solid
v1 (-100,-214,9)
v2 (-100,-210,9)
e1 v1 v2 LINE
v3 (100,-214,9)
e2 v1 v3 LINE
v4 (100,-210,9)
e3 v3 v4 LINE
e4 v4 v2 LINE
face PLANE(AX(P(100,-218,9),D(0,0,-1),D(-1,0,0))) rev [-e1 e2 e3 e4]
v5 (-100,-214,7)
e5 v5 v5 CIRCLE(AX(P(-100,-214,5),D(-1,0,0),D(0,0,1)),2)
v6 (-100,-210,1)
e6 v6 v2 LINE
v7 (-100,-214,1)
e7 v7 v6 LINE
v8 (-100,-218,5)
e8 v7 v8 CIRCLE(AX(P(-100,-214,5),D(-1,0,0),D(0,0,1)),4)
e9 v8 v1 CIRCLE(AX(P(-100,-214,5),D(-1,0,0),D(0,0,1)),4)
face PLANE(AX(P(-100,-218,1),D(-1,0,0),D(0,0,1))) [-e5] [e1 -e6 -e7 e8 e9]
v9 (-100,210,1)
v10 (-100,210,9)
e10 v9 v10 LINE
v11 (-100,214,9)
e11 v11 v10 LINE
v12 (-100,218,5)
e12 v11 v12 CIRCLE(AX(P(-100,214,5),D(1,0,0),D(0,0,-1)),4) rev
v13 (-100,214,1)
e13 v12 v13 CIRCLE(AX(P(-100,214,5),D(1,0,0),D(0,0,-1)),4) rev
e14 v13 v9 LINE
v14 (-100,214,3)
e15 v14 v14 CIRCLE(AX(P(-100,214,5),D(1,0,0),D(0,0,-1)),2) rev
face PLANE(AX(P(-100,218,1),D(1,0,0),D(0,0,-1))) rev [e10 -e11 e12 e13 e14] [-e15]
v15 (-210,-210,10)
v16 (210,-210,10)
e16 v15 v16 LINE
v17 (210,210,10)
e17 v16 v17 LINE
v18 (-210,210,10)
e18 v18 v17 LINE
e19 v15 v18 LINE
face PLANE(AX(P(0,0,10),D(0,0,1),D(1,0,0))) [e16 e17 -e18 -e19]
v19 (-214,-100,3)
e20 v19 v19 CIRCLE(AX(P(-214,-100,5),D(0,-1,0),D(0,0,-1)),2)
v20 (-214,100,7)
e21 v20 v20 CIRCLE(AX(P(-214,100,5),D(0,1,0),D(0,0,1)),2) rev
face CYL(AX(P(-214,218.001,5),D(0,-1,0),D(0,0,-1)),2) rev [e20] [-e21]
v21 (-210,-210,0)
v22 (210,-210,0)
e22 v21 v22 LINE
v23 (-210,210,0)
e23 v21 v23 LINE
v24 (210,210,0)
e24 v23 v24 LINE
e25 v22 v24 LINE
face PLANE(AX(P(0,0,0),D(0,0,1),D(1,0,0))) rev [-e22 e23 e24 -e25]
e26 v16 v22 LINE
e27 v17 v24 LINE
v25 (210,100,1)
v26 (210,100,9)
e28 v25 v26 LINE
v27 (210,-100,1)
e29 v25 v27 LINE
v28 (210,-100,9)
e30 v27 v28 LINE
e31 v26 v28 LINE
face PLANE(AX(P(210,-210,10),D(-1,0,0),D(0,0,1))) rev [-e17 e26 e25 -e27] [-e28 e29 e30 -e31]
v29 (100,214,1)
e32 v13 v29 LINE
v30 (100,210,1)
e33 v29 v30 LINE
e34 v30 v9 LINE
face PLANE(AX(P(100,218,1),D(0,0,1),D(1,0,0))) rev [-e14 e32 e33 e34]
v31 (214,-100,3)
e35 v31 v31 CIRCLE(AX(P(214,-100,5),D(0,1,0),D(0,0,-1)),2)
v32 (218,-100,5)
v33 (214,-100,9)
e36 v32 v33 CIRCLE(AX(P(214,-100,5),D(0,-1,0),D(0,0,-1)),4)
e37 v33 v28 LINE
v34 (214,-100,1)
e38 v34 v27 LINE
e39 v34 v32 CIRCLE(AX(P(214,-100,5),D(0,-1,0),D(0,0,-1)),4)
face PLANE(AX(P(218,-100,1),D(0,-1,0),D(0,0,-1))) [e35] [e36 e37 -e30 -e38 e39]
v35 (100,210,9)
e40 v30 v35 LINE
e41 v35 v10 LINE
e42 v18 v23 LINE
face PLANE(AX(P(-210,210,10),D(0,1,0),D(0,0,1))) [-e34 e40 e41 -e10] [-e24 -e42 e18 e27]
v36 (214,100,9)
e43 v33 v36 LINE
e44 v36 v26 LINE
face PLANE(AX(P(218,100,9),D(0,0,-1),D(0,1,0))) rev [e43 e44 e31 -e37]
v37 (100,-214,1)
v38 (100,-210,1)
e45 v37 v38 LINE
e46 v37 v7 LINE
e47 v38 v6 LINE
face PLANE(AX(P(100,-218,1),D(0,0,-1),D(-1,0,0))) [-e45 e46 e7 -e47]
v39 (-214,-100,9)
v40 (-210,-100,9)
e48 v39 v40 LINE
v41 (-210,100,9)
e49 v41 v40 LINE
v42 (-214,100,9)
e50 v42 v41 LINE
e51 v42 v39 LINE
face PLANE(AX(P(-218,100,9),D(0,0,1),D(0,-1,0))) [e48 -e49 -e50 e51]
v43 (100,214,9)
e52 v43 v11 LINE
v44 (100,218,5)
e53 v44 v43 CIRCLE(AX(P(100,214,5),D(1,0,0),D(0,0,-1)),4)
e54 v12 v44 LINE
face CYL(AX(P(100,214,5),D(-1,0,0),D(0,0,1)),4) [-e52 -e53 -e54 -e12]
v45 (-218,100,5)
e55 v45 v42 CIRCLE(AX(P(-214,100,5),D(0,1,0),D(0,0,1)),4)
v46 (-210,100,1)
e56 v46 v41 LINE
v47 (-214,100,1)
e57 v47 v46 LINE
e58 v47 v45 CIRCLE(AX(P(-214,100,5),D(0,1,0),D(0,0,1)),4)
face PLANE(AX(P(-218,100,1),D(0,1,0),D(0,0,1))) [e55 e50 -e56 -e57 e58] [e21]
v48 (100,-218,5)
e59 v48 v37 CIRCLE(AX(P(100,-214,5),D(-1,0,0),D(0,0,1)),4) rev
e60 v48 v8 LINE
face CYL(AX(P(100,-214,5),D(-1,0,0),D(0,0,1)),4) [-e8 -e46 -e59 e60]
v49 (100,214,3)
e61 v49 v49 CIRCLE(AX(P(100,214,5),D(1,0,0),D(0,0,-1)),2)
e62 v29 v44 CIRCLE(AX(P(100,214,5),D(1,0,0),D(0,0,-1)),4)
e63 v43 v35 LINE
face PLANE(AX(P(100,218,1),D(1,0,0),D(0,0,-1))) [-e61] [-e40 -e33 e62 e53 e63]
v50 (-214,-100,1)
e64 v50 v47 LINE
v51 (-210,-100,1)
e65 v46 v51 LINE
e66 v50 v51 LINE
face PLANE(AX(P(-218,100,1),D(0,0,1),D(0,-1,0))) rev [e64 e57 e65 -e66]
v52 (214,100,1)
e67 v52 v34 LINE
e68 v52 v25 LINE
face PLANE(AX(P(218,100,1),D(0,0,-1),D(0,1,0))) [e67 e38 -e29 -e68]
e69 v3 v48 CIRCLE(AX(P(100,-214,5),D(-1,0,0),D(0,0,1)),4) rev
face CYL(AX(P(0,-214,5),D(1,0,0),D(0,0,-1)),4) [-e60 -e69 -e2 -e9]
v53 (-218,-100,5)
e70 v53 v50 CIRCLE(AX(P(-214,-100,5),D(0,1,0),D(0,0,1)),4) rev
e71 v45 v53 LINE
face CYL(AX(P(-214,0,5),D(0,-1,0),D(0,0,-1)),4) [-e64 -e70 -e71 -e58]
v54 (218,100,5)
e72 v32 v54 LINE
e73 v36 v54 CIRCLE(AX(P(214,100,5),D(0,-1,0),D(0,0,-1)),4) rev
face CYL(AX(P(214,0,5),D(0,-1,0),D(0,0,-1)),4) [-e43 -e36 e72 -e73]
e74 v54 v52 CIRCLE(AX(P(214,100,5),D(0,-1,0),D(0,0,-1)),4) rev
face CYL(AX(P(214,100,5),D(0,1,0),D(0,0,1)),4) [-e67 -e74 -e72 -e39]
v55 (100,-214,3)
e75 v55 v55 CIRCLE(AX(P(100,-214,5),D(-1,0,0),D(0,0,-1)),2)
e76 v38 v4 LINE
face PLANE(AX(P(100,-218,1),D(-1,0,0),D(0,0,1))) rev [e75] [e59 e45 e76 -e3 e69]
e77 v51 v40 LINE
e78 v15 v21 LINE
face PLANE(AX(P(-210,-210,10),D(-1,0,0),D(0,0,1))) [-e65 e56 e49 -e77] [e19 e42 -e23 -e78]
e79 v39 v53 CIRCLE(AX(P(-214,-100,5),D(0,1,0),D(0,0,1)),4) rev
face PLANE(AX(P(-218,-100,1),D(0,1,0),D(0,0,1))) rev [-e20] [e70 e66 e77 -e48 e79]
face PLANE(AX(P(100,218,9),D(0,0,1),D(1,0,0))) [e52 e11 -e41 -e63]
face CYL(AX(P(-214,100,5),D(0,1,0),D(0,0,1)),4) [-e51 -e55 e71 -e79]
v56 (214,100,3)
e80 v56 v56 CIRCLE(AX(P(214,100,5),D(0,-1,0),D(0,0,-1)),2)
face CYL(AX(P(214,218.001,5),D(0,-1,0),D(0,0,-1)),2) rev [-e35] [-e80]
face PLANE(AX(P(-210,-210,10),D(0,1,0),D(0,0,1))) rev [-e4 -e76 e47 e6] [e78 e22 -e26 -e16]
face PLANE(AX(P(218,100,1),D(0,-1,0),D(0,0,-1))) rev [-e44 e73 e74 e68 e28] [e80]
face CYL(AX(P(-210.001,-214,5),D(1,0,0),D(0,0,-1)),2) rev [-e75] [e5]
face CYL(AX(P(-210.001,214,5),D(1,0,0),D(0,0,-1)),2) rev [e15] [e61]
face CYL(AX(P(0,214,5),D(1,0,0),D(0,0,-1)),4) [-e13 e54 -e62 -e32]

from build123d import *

# Parameters (mm, degrees)
SKETCH_1_W             = 420
SKETCH_1_H             = 420
EXTRUDE_1_DEPTH        = 10
SKETCH_2_W             = 200
SKETCH_2_H             = 8
EXTRUDE_2_DEPTH        = 8
CUT_EXTRUDE_1_REACH    = 381.109
SKETCH_3_R             = 2
FILLET_1_R             = 4
FILLET_1_OF_MIRROR_1_R = 4
SKETCH_4_W             = 8
SKETCH_4_H             = 200
EXTRUDE_3_DEPTH        = 8
FILLET_2_R             = 4
CUT_EXTRUDE_2_REACH    = 387.679
SKETCH_5_R             = 2
FILLET_2_OF_MIRROR_3_R = 4


with BuildPart() as part:
    # 草图1 → 凸台-拉伸1 (new body)
    with BuildSketch(Plane.XY):
        Rectangle(SKETCH_1_W, SKETCH_1_H)
    extrude_1 = extrude(amount=EXTRUDE_1_DEPTH)

    # 草图2 → 凸台-拉伸2 (add)
    with BuildSketch(Plane(origin=(0, 210, 0), x_dir=(1, 0, 0), z_dir=(0, 1, 0))):
        with Locations((0, -5)):
            Rectangle(SKETCH_2_W, SKETCH_2_H)
    extrude_2 = extrude(amount=EXTRUDE_2_DEPTH)

    # 草图3 → 切除-拉伸1 (cut, up to next)
    with BuildSketch(Plane(origin=(100, 0, 0), x_dir=(0, 0, -1), z_dir=(1, 0, 0)), mode=Mode.PRIVATE) as cut_extrude_1_sk1:
        with Locations((-5, 214)):
            Circle(SKETCH_3_R)
    cut_extrude_1_tool1 = extrude(cut_extrude_1_sk1.sketch, amount=-CUT_EXTRUDE_1_REACH, mode=Mode.PRIVATE) & part.part
    cut_extrude_1 = cut_extrude_1_tool1.solids().sort_by_distance((100, 214, 5))[0]
    add(cut_extrude_1, mode=Mode.SUBTRACT)

    # 圆角1
    fillet_1_edges = [part.edges().sort_by_distance(p)[0] for p in [
        (0, 218, 1),
        (0, 218, 9),
    ]]
    fillet(fillet_1_edges, radius=FILLET_1_R - 0.0001)  # a hair under: the kernel refuses the full size

    # 镜向1: 凸台-拉伸1, 凸台-拉伸2, 切除-拉伸1 across plane
    add(extrude_1.mirror(Plane.ZX))
    add(extrude_2.mirror(Plane.ZX))
    add(cut_extrude_1.mirror(Plane.ZX), mode=Mode.SUBTRACT)

    # 圆角1 of 镜向1
    fillet_1_of_mirror_1_edges = [part.edges().sort_by_distance(p)[0] for p in [
        (0, -218, 1),
        (0, -218, 9),
    ]]
    fillet(fillet_1_of_mirror_1_edges, radius=FILLET_1_OF_MIRROR_1_R - 0.0001)  # a hair under: the kernel refuses the full size

    # 草图4 → 凸台-拉伸3 (add)
    with BuildSketch(Plane.ZY.offset(210)):
        with Locations((5, 0)):
            Rectangle(SKETCH_4_W, SKETCH_4_H)
    extrude_3 = extrude(amount=EXTRUDE_3_DEPTH)

    # 圆角2
    fillet_2_edges = [part.edges().sort_by_distance(p)[0] for p in [
        (-218, 0, 9),
        (-218, 0, 1),
    ]]
    fillet(fillet_2_edges, radius=FILLET_2_R - 0.0001)  # a hair under: the kernel refuses the full size

    # 草图5 → 切除-拉伸2 (cut, up to next)
    with BuildSketch(Plane.XZ.offset(100), mode=Mode.PRIVATE) as cut_extrude_2_sk1:
        with Locations(Location((-214, 5, 0), (0, 0, 270))):
            Circle(SKETCH_5_R)
    cut_extrude_2_tool1 = extrude(cut_extrude_2_sk1.sketch, amount=-CUT_EXTRUDE_2_REACH, mode=Mode.PRIVATE) & part.part
    cut_extrude_2 = cut_extrude_2_tool1.solids().sort_by_distance((-214, -100, 5))[0]
    add(cut_extrude_2, mode=Mode.SUBTRACT)

    # 镜向3: 凸台-拉伸3, 切除-拉伸2 across plane
    add(extrude_3.mirror(Plane(origin=(0, 0, 0), x_dir=(0, 0, 1), z_dir=(1, 0, 0))))
    add(cut_extrude_2.mirror(Plane(origin=(0, 0, 0), x_dir=(0, 0, 1), z_dir=(1, 0, 0))), mode=Mode.SUBTRACT)

    # 圆角2 of 镜向3
    fillet_2_of_mirror_3_edges = [part.edges().sort_by_distance(p)[0] for p in [
        (218, 0, 9),
        (218, 0, 1),
    ]]
    fillet(fillet_2_of_mirror_3_edges, radius=FILLET_2_OF_MIRROR_3_R - 0.0001)  # a hair under: the kernel refuses the full size


solid = part.part
